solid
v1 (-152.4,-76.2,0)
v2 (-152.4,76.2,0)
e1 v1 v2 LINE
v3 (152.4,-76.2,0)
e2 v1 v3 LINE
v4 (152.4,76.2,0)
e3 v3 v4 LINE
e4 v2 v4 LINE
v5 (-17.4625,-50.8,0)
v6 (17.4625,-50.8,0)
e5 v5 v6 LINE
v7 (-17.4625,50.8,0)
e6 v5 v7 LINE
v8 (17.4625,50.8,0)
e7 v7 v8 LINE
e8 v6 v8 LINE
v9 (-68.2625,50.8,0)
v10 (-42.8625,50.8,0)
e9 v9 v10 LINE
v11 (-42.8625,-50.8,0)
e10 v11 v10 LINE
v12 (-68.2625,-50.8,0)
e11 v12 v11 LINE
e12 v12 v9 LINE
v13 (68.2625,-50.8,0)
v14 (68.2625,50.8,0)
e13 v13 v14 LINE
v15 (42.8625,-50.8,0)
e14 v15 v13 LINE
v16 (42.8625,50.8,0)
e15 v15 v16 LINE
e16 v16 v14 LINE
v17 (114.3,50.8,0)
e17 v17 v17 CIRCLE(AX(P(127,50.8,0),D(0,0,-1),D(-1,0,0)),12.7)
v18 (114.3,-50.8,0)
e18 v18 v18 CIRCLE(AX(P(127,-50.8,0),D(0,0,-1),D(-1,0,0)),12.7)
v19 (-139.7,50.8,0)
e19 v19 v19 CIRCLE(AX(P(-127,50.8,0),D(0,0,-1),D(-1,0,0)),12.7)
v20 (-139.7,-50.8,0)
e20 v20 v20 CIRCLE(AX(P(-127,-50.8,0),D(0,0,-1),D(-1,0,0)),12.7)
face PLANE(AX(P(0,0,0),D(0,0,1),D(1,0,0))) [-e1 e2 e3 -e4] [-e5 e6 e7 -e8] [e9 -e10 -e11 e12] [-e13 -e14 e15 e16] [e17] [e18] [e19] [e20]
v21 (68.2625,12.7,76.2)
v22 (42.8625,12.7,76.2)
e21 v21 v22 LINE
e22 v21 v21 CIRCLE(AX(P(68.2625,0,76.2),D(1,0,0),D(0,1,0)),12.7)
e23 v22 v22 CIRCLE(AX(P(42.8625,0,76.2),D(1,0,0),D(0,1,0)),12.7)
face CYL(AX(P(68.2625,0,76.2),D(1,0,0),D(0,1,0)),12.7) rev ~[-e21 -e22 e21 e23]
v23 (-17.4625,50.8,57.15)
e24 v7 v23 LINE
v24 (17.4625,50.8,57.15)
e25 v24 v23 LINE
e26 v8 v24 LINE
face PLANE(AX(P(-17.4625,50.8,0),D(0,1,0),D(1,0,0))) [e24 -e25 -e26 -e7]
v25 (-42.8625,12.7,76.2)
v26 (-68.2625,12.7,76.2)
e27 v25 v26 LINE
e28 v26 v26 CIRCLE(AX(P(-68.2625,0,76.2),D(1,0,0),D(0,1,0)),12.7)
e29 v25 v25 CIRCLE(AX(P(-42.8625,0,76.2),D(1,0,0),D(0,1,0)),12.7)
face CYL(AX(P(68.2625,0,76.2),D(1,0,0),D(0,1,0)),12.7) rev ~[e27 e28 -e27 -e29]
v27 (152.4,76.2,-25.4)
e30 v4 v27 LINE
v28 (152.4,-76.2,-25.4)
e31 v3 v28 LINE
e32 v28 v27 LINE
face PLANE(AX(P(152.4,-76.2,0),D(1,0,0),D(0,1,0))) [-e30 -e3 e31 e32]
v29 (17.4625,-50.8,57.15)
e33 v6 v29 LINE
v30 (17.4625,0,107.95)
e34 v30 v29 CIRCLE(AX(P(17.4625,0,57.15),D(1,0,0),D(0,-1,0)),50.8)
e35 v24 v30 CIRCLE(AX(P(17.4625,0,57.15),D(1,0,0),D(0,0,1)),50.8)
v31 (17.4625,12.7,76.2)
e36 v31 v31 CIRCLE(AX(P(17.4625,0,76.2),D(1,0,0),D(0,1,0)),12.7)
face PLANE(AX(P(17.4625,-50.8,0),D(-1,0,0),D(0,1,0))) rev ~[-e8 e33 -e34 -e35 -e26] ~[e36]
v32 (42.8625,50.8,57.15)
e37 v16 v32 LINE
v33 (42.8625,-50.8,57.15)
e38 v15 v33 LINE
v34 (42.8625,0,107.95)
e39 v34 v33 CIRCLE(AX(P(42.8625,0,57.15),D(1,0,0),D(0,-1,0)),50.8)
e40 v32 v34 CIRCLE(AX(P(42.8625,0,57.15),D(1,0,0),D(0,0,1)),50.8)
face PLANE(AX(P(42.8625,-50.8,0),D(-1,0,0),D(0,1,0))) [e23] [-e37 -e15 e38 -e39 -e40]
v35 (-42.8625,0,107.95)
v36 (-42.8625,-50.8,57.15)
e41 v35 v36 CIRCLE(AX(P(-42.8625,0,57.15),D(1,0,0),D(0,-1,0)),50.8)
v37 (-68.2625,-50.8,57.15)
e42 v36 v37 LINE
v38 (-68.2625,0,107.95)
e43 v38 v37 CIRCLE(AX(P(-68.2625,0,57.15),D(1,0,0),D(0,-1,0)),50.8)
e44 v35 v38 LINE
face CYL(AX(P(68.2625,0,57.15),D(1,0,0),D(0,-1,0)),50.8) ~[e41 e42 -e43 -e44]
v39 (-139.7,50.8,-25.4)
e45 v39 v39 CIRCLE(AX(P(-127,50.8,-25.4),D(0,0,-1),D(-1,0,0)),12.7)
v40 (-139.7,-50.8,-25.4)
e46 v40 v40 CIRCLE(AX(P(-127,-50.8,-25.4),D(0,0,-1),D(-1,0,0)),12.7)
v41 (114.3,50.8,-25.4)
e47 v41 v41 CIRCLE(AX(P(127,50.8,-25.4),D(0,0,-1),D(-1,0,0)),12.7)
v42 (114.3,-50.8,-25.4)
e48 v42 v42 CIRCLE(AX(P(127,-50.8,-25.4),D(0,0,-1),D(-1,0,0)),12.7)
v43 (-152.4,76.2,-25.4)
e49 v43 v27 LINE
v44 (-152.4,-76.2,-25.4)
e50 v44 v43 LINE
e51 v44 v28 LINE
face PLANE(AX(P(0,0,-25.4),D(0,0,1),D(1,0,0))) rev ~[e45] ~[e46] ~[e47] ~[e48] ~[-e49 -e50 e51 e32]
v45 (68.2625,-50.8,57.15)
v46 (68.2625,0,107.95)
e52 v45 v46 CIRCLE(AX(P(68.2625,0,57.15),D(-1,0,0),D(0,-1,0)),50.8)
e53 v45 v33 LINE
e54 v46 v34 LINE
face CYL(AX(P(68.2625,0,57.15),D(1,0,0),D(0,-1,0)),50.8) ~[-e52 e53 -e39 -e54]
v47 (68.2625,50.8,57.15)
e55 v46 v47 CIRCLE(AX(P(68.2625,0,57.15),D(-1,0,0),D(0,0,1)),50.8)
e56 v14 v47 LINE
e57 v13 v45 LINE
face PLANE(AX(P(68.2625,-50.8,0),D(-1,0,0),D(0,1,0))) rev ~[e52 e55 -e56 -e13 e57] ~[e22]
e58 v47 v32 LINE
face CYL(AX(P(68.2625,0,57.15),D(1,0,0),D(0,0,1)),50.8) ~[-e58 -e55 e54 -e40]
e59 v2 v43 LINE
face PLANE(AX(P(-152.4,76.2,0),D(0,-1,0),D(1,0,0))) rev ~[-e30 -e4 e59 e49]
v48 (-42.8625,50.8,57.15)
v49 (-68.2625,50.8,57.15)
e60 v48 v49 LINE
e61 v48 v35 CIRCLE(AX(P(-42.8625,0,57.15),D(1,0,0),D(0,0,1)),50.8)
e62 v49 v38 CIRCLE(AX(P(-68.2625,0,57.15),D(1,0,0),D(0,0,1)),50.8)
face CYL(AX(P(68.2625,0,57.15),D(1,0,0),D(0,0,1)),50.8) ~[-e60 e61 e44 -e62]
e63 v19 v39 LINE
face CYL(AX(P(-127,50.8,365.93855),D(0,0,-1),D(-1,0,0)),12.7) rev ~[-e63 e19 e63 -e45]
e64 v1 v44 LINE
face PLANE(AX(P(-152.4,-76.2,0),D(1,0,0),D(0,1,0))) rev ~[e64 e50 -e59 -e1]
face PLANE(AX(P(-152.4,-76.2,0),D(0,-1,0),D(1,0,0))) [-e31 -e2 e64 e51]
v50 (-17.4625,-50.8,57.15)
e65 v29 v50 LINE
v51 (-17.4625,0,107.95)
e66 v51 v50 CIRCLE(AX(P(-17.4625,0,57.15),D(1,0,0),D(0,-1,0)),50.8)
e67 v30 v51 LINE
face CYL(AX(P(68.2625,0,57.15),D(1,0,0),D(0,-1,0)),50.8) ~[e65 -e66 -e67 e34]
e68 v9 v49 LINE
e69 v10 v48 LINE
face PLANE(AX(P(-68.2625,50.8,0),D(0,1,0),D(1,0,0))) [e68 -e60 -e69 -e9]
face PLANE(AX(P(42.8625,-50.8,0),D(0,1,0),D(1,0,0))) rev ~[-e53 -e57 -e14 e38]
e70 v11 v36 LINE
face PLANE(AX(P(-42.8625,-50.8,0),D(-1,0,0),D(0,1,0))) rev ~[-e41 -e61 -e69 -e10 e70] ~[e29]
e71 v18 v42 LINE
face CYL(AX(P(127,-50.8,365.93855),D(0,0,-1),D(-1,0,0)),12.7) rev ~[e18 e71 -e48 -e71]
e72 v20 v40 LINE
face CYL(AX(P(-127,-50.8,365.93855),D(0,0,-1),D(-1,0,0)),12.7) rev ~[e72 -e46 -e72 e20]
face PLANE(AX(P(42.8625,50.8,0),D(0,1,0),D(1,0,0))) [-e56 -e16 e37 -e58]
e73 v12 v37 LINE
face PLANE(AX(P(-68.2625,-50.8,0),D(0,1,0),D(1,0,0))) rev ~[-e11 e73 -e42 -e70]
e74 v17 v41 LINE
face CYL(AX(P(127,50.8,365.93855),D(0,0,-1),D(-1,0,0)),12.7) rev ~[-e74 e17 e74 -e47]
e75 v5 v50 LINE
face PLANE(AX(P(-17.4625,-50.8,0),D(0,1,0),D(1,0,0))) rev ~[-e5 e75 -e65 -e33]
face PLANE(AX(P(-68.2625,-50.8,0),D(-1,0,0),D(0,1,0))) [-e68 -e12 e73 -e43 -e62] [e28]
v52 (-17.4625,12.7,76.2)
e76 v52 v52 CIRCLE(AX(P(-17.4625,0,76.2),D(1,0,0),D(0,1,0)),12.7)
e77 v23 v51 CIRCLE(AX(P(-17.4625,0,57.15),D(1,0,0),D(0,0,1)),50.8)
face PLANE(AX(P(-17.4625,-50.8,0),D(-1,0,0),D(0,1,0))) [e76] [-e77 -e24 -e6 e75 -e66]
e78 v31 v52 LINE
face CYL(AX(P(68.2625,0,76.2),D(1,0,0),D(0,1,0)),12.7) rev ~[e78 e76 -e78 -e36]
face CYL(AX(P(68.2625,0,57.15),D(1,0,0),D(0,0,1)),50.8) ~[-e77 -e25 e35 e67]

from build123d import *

# Parameters (mm, degrees)
F0_W     = 304.8
F0_H     = 152.4
F0_W_2   = 25.4
F0_H_2   = 101.6
F0_W_3   = 34.925
F1_DEPTH = 25.4
F2_DEPTH = 107.95
F4_DEPTH = 220.6635
F3_R     = 12.7
F5_DEPTH = 220.6635
F6_D     = 25.4


# Not quite as in the source:
# - a feature names something its author has since deleted; it is built from what else it names


with BuildPart() as f1:
    # F0 (on Top) → F1 (new body)
    with BuildSketch(Plane.XY):
        Rectangle(F0_W, F0_H)
        with Locations((-55.5625, 0)):
            Rectangle(F0_W_2, F0_H_2, mode=Mode.SUBTRACT)
        Rectangle(F0_W_3, F0_H_2, mode=Mode.SUBTRACT)
        with Locations((55.5625, 0)):
            Rectangle(F0_W_2, F0_H_2, mode=Mode.SUBTRACT)
        Rectangle(F0_W_3, F0_H_2)
        with Locations((-55.5625, 0)):
            Rectangle(F0_W_2, F0_H_2)
        with Locations((55.5625, 0)):
            Rectangle(F0_W_2, F0_H_2)
    extrude(amount=-F1_DEPTH)

    # F0 (on Top) → F2 (join)
    with BuildSketch(Plane.XY):
        with Locations((55.5625, 0)):
            Rectangle(F0_W_2, F0_H_2)
        Rectangle(F0_W_3, F0_H_2)
        with Locations((-55.5625, 0)):
            Rectangle(F0_W_2, F0_H_2)
    extrude(amount=F2_DEPTH)

    # F3 (on face) → F4 (cut, through all)
    with BuildSketch(Plane.YZ.offset(68.2625)):
        with BuildLine():
            Line((1e-10, 107.95), (-50.8, 107.95))
            Line((-50.8, 107.95), (-50.8, 57.15))
            ThreePointArc((-50.8, 57.15), (-35.9210244842, 93.0710244843), (1e-10, 107.95))
        make_face()
        with BuildLine():
            Line((50.8, 107.95), (1e-10, 107.95))
            ThreePointArc((1e-10, 107.95), (35.9210244843, 93.0710244842), (50.8, 57.15))
            Line((50.8, 57.15), (50.8, 107.95))
        make_face()
    extrude(amount=-F4_DEPTH, mode=Mode.SUBTRACT)

    # F3 (on face) → F5 (cut, through all)
    with BuildSketch(Plane.YZ.offset(68.2625)):
        with Locations((0, 76.2)):
            Circle(F3_R)
    extrude(amount=-F5_DEPTH, mode=Mode.SUBTRACT)

    # F6 (through all)
    with Locations(Plane.XY):
        with Locations((127, -50.8), (127, 50.8), (-127, 50.8), (-127, -50.8)):
            Hole(F6_D / 2)


solid = f1.part
